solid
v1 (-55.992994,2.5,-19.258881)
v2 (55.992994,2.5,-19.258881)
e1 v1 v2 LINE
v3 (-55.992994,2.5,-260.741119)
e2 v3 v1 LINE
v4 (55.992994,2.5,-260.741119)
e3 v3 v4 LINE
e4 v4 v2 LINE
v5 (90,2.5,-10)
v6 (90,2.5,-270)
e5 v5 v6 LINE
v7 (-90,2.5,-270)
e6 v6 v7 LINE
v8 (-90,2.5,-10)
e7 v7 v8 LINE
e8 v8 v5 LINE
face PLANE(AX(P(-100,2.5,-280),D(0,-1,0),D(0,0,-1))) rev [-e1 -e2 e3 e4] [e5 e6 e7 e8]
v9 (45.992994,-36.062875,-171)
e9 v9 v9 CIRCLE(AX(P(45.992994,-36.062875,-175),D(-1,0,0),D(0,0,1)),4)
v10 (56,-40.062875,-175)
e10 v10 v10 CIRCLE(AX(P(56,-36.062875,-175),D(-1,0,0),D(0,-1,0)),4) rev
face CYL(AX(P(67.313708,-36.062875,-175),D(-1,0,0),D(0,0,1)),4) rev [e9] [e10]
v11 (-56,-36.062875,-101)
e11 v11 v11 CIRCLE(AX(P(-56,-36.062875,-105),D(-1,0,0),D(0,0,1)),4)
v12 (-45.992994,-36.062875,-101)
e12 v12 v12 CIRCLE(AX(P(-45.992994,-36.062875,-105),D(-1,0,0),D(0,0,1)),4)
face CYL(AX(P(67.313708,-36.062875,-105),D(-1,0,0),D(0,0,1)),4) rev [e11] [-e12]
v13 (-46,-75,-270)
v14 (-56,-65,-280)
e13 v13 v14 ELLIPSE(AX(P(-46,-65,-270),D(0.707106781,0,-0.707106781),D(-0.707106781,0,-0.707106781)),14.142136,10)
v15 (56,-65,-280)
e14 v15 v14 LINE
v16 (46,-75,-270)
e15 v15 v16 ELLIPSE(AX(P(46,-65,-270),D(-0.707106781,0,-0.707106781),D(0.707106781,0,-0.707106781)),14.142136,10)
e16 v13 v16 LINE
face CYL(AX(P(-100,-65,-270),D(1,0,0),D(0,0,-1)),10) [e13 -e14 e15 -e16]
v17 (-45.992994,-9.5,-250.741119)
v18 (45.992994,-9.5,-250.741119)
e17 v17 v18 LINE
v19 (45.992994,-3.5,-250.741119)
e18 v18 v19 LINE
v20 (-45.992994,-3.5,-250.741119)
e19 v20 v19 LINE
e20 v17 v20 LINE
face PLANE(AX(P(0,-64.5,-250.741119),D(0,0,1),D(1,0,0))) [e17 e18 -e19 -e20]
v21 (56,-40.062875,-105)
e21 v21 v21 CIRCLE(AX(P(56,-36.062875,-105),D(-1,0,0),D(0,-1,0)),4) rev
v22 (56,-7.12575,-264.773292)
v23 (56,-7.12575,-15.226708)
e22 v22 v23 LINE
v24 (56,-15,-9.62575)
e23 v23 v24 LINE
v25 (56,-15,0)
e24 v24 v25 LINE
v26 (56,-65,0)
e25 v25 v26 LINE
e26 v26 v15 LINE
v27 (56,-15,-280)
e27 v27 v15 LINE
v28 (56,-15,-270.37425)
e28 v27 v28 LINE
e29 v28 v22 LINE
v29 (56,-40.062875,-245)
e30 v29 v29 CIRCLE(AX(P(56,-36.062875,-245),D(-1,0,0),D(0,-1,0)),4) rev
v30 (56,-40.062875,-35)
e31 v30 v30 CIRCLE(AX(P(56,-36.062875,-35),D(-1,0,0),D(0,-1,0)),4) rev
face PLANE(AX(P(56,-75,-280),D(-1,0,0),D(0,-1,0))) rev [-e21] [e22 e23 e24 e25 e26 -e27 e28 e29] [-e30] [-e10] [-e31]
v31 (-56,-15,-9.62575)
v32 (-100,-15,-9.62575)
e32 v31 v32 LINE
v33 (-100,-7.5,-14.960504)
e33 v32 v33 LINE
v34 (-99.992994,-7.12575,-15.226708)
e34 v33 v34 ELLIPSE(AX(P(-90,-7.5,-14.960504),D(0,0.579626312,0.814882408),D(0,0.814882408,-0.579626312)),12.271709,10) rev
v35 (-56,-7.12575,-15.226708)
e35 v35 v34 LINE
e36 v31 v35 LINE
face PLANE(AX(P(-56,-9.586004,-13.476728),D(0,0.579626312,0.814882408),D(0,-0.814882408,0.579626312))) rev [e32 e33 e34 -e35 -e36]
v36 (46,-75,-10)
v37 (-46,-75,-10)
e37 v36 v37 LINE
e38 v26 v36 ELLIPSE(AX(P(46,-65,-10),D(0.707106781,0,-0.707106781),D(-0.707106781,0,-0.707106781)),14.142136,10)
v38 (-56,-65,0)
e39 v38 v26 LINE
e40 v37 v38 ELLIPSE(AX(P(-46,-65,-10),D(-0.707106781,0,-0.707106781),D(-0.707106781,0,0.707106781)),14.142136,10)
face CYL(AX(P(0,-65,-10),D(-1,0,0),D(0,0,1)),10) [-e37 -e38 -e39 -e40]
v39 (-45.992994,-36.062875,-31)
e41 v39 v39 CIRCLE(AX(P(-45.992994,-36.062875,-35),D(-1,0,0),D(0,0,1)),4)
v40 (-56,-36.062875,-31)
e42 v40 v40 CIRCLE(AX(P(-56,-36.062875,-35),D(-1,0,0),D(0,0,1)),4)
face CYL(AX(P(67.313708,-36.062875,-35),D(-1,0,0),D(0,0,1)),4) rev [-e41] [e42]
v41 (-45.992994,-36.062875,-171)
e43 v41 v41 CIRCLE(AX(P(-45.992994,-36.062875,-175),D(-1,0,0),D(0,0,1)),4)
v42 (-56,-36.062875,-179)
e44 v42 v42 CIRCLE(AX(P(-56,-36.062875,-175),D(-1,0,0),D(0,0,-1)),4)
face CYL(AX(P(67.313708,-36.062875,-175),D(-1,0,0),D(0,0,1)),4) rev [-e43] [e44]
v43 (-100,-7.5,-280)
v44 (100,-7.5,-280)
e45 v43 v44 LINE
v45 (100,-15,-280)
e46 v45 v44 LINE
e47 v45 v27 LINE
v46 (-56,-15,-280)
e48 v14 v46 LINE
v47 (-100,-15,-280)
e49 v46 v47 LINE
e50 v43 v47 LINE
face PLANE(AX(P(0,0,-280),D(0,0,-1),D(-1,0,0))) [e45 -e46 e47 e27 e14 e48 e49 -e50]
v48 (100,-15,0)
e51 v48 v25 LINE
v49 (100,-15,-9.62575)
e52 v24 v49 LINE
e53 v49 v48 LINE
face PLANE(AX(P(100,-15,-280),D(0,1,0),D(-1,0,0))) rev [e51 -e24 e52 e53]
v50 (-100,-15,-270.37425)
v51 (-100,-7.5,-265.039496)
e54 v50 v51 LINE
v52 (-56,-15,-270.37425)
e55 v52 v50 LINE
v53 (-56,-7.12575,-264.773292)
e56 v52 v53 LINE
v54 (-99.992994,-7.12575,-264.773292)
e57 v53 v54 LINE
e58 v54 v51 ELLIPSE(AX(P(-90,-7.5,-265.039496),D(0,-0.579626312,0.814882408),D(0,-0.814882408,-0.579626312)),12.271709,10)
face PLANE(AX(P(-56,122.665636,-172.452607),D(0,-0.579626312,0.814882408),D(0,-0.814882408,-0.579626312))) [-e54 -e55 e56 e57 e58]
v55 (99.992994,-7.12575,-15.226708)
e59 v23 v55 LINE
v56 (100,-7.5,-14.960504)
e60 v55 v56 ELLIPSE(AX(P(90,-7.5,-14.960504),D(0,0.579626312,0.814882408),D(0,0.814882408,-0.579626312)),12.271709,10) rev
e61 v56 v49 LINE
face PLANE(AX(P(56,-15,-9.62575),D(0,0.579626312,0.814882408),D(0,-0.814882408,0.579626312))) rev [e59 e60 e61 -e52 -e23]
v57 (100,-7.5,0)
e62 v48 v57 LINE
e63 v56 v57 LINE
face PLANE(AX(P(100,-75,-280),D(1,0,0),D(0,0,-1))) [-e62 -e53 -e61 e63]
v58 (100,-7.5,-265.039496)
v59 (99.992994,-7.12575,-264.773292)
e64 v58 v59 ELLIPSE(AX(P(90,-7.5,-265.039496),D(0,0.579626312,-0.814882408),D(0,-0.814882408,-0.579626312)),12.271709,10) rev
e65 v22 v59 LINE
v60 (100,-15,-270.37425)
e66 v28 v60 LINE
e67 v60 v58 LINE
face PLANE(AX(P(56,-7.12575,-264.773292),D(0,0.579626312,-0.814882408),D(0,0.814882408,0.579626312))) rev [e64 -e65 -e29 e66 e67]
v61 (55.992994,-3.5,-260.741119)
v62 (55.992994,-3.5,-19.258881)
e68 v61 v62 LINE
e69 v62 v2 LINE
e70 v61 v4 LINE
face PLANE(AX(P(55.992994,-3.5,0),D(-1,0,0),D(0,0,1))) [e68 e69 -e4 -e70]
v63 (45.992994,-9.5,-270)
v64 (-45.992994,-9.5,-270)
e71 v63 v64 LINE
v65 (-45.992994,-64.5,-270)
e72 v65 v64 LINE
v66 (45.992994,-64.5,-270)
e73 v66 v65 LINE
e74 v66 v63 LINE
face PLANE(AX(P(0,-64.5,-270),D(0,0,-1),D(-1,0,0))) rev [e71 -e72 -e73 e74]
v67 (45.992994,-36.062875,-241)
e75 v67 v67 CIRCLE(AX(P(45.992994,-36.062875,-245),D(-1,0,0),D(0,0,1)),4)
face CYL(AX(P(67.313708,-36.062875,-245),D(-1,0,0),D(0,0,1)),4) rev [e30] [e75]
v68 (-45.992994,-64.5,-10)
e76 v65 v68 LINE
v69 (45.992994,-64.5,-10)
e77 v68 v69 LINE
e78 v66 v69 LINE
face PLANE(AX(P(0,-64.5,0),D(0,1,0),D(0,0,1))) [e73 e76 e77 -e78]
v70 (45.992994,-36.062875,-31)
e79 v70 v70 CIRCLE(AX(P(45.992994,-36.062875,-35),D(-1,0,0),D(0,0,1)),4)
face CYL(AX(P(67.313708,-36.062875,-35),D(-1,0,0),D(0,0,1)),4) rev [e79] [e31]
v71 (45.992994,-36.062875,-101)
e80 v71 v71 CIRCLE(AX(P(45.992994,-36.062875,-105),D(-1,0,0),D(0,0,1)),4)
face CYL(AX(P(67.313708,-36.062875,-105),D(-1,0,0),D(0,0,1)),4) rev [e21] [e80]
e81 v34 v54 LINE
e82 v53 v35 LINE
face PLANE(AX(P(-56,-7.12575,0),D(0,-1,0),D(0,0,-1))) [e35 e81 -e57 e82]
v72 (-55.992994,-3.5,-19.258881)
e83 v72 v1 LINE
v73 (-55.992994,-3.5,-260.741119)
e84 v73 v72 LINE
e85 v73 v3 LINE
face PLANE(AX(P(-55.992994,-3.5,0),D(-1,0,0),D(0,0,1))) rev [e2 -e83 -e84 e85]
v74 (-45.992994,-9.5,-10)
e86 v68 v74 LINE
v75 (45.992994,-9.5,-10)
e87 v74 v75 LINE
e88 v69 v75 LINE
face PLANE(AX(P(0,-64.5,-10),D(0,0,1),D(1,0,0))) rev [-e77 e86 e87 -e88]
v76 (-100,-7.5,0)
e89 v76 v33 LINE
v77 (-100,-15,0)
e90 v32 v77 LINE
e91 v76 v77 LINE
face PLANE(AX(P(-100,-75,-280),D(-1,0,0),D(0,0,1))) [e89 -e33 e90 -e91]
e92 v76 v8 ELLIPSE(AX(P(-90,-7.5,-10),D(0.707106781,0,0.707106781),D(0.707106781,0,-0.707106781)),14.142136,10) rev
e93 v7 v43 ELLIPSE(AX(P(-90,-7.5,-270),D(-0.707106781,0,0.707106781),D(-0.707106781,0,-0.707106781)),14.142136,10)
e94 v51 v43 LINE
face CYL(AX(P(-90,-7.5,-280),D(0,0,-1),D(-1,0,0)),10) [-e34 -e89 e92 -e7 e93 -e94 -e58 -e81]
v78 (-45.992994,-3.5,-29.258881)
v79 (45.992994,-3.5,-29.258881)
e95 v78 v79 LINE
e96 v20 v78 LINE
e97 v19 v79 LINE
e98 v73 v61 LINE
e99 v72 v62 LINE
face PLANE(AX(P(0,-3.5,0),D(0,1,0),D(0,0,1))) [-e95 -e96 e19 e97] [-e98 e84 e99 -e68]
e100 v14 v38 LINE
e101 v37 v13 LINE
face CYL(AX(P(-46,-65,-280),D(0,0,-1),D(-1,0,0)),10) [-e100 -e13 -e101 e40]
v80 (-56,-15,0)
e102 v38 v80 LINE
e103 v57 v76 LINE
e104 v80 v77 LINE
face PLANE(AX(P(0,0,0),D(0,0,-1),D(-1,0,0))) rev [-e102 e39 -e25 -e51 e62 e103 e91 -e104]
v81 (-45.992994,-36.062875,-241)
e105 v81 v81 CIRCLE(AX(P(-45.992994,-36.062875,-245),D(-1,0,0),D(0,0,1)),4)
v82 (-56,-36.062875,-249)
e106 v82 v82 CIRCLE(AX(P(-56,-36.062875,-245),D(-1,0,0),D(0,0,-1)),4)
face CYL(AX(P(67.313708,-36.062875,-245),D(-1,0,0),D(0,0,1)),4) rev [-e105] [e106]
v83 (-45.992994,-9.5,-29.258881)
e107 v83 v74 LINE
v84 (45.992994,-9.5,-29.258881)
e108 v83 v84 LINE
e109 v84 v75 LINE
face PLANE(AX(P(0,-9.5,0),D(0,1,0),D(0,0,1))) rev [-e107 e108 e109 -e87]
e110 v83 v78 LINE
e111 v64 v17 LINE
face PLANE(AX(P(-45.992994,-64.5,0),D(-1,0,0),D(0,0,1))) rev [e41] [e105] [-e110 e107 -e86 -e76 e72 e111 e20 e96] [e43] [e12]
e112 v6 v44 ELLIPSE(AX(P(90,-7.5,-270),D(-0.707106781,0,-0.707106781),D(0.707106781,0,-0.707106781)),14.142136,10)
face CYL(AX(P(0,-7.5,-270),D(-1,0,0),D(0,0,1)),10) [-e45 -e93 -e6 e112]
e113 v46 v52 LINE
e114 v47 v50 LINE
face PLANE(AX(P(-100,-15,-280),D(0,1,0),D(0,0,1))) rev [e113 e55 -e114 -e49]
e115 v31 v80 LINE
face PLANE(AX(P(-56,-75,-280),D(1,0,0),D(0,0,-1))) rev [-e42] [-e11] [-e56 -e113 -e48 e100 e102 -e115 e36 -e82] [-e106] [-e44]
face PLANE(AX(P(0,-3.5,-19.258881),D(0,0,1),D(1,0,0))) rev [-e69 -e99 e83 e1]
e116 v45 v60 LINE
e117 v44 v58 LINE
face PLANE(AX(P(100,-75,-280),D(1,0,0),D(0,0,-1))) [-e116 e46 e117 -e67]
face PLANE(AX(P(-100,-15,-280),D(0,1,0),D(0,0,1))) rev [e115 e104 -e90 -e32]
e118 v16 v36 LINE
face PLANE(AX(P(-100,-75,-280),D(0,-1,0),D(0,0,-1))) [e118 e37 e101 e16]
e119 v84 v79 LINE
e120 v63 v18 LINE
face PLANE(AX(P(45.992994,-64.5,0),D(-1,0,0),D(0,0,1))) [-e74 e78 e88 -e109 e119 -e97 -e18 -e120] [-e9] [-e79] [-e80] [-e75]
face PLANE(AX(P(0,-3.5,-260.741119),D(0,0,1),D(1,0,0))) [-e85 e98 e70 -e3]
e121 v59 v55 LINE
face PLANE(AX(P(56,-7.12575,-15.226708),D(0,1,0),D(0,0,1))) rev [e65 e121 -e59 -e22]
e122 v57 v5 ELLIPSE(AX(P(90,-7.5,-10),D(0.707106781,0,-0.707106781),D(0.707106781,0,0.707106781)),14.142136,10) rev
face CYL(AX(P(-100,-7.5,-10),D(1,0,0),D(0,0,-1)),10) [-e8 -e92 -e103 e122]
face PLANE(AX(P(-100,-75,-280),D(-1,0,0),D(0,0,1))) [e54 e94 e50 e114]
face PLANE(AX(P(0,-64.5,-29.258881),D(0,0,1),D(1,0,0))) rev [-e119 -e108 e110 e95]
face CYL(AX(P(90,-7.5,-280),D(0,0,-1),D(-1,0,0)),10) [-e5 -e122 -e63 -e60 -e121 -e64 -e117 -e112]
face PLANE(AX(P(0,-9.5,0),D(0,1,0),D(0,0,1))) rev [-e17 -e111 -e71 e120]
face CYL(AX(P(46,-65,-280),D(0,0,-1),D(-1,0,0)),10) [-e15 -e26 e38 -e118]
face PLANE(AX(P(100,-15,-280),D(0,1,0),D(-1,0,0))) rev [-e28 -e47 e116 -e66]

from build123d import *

# Parameters (mm, degrees)
SKETCH1_W           = 200
SKETCH1_H           = 150
BOSS_EXTRUDE1_DEPTH = 280
SKETCH2_W           = 44
SKETCH2_H           = 60
SKETCH2_W_2         = 34
SKETCH2_H_2         = 72.5
CUT_EXTRUDE1_DEPTH  = 280
CUT_EXTRUDE5_DEPTH  = 200
CUT_EXTRUDE8_DEPTH  = 44
CUT_EXTRUDE9_DEPTH  = 44
SKETCH6_W           = 112
SKETCH6_H           = 52.5
CUT_EXTRUDE7_DEPTH  = 280
FILLET1_START       = -100
FILLET1_DEPTH       = 200
FILLET1_START_2     = -76
FILLET1_2_DEPTH     = 10
FILLET1_START_3     = 66
FILLET1_3_DEPTH     = 10
FILLET1_START_4     = -66
FILLET1_4_DEPTH     = 132
FILLET1_START_5     = -281
FILLET1_5_DEPTH     = 282
SKETCH8_W           = 152
SKETCH8_H           = 72.5
CUT_EXTRUDE10_DEPTH = 280
SKETCH9_W           = 111.98598877
SKETCH9_H           = 241.482238642
SKETCH9_W_2         = 91.98598877
SKETCH9_H_2         = 221.482238642
SKETCH9_H_3         = 10
CUT_EXTRUDE11_DEPTH = 6
SKETCH9_3_W         = 45.992994385
SKETCH9_3_H         = 221.482238642
CUT_EXTRUDE12_DEPTH = 67
CUT_EXTRUDE13_START = -12
SKETCH9_7_W         = 91.98598877
SKETCH9_7_H         = 9.258880679
CUT_EXTRUDE13_DEPTH = 55
CUT_EXTRUDE14_START = -12
SKETCH9_9_W         = 91.98598877
SKETCH9_9_H         = 10
CUT_EXTRUDE14_DEPTH = 55
CUT_EXTRUDE15_REACH = 331.182
SKETCH11_R          = 4


with BuildPart() as part:
    # Sketch1 → Boss-Extrude1 (new body)
    with BuildSketch(Plane.XY):
        Rectangle(SKETCH1_W, SKETCH1_H)
    extrude(amount=-BOSS_EXTRUDE1_DEPTH)

    # Sketch2 → Cut-Extrude1 (cut)
    with BuildSketch(Plane.XY):
        with Locations((78, -45)):
            Rectangle(SKETCH2_W, SKETCH2_H)
        with Locations((-78, -45)):
            Rectangle(SKETCH2_W, SKETCH2_H)
        with Locations((83, 38.75)):
            Rectangle(SKETCH2_W_2, SKETCH2_H_2)
        with Locations((-83, 38.75)):
            Rectangle(SKETCH2_W_2, SKETCH2_H_2)
    extrude(amount=-CUT_EXTRUDE1_DEPTH, mode=Mode.SUBTRACT)

    # Sketch3 → Cut-Extrude5 (cut)
    with BuildSketch(Plane.ZY.offset(100)):
        Polygon((-280, 2.5), (-274.399041425, 2.5), (-252, 2.5), (-218.971094498, 75), (-280, 75), align=None)
        Polygon((-236.455453487, 12.5), (-168.766953205, 12.5), (-60.438488841, 12.5), (-94.602997447, 65), (-144.84946991, 65), (-212.537970192, 65), align=None)
        Polygon((-89.179559504, 75), (-42, 2.5), (-5.600958575, 2.5), (0, 2.5), (0, 75), align=None)
    extrude(amount=-CUT_EXTRUDE5_DEPTH, mode=Mode.SUBTRACT)

    # Sketch5 → Cut-Extrude8 (cut)
    with BuildSketch(Plane.ZY.offset(100)):
        Polygon((-264.773291637, -7.125749789), (-270.374250211, -15), (-140, -15), (-140, -7.125749789), align=None)
        Polygon((-15.226708363, -7.125749789), (-140, -7.125749789), (-140, -15), (-9.625749789, -15), align=None)
    extrude(amount=-CUT_EXTRUDE8_DEPTH, mode=Mode.SUBTRACT)

    # Sketch7 → Cut-Extrude9 (cut)
    with BuildSketch(Plane(origin=(100, 0, 0), x_dir=(0, 0, -1), z_dir=(1, 0, 0))):
        Polygon((9.625749789, -15), (15.226708363, -7.125749789), (264.773291637, -7.125749789), (270.374250211, -15), align=None)
    extrude(amount=-CUT_EXTRUDE9_DEPTH, mode=Mode.SUBTRACT)

    # Sketch6 → Cut-Extrude7 (cut)
    with BuildSketch(Plane.XY):
        with Locations((0, 38.75)):
            Rectangle(SKETCH6_W, SKETCH6_H)
    extrude(amount=-CUT_EXTRUDE7_DEPTH, mode=Mode.SUBTRACT)

    # Fillet1: read off the stored shape, not the designer's step
    # Fillet1 outline → Fillet1 (cut)
    with BuildSketch(Plane.YZ.offset(FILLET1_START)):
        with BuildLine():
            Line((-75, 0), (-75, -10))
            ThreePointArc((-75, -10), (-72.071067812, -2.928932188), (-65, 0))
            Line((-65, 0), (-75, 0))
        make_face()
        with BuildLine():
            ThreePointArc((-65, -280), (-72.071067812, -277.071067812), (-75, -270))
            Line((-75, -270), (-75, -280))
            Line((-75, -280), (-65, -280))
        make_face()
        with BuildLine():
            Line((2.5, 0), (-7.5, 0))
            ThreePointArc((-7.5, 0), (-0.428932188, -2.928932188), (2.5, -10))
            Line((2.5, -10), (2.5, 0))
        make_face()
        with BuildLine():
            ThreePointArc((2.5, -270), (-0.428932188, -277.071067812), (-7.5, -280))
            Line((-7.5, -280), (2.5, -280))
            Line((2.5, -280), (2.5, -270))
        make_face()
        with BuildLine():
            Line((75, -89.179559504), (70.454316835, -86.221444616))
            ThreePointArc((70.454316835, -86.221444616), (73.790425711, -89.835564613), (75, -94.602997447))
            Line((75, -94.602997447), (75, -89.179559504))
        make_face()
        with BuildLine():
            ThreePointArc((75, -212.537970192), (73.410042611, -217.948255145), (69.145763344, -221.638115591))
            Line((69.145763344, -221.638115591), (75, -218.971094498))
            Line((75, -218.971094498), (75, -212.537970192))
        make_face()
    extrude(amount=FILLET1_DEPTH, mode=Mode.SUBTRACT)

    # Fillet1 2 outline → Fillet1 2 (add)
    with BuildSketch(Plane.YZ.offset(FILLET1_START_2)):
        with BuildLine():
            ThreePointArc((7.045683165, -44.958114888), (3.709574289, -41.343994891), (2.5, -36.576562057))
            Line((2.5, -36.576562057), (2.5, -258.433124306))
            ThreePointArc((2.5, -258.433124306), (4.089957389, -253.022839352), (8.354236656, -249.332978906))
            Line((8.354236656, -249.332978906), (69.145763344, -221.638115591))
            ThreePointArc((69.145763344, -221.638115591), (73.410042611, -217.948255145), (75, -212.537970192))
            Line((75, -212.537970192), (75, -94.602997447))
            ThreePointArc((75, -94.602997447), (73.790425711, -89.835564613), (70.454316835, -86.221444616))
            Line((70.454316835, -86.221444616), (7.045683165, -44.958114888))
        make_face()
    extrude(amount=FILLET1_2_DEPTH)

    # Fillet1 3 outline → Fillet1 3 (add)
    with BuildSketch(Plane.YZ.offset(FILLET1_START_3)):
        with BuildLine():
            ThreePointArc((7.045683165, -44.958114888), (3.709574289, -41.343994891), (2.5, -36.576562057))
            Line((2.5, -36.576562057), (2.5, -258.433124306))
            ThreePointArc((2.5, -258.433124306), (4.089957389, -253.022839352), (8.354236656, -249.332978906))
            Line((8.354236656, -249.332978906), (69.145763344, -221.638115591))
            ThreePointArc((69.145763344, -221.638115591), (73.410042611, -217.948255145), (75, -212.537970192))
            Line((75, -212.537970192), (75, -94.602997447))
            ThreePointArc((75, -94.602997447), (73.790425711, -89.835564613), (70.454316835, -86.221444616))
            Line((70.454316835, -86.221444616), (7.045683165, -44.958114888))
        make_face()
    extrude(amount=FILLET1_3_DEPTH)

    # Fillet1 4 outline → Fillet1 4 (add)
    with BuildSketch(Plane.YZ.offset(FILLET1_START_4)):
        with BuildLine():
            ThreePointArc((7.045683165, -44.958114888), (3.709574289, -41.343994891), (2.5, -36.576562057))
            Line((2.5, -36.576562057), (2.5, -42))
            Line((2.5, -42), (7.045683165, -44.958114888))
        make_face()
        with BuildLine():
            Line((2.5, -252), (2.5, -258.433124306))
            ThreePointArc((2.5, -258.433124306), (4.089957389, -253.022839352), (8.354236656, -249.332978906))
            Line((8.354236656, -249.332978906), (2.5, -252))
        make_face()
    extrude(amount=FILLET1_4_DEPTH)

    # Fillet1 5 outline → Fillet1 5 (cut)
    with BuildSketch(Plane.XY.offset(FILLET1_START_5)):
        with BuildLine():
            ThreePointArc((56, 75), (63.071067812, 72.071067812), (66, 65))
            Line((66, 65), (66, 12.5))
            ThreePointArc((66, 12.5), (68.928932188, 5.428932188), (76, 2.5))
            Line((76, 2.5), (76, 75))
            Line((76, 75), (56, 75))
        make_face()
        with BuildLine():
            ThreePointArc((-66, 65), (-63.071067812, 72.071067812), (-56, 75))
            Line((-56, 75), (-76, 75))
            Line((-76, 75), (-76, 2.5))
            ThreePointArc((-76, 2.5), (-68.928932188, 5.428932188), (-66, 12.5))
            Line((-66, 12.5), (-66, 65))
        make_face()
        with BuildLine():
            Line((100, 2.5), (90, 2.5))
            ThreePointArc((90, 2.5), (97.071067812, -0.428932188), (100, -7.5))
            Line((100, -7.5), (100, 2.5))
        make_face()
        with BuildLine():
            Line((-90, 2.5), (-100, 2.5))
            Line((-100, 2.5), (-100, -7.5))
            ThreePointArc((-100, -7.5), (-97.071067812, -0.428932188), (-90, 2.5))
        make_face()
        with BuildLine():
            Line((56, -75), (56, -65))
            ThreePointArc((56, -65), (53.071067812, -72.071067812), (46, -75))
            Line((46, -75), (56, -75))
        make_face()
        with BuildLine():
            ThreePointArc((-46, -75), (-53.071067812, -72.071067812), (-56, -65))
            Line((-56, -65), (-56, -75))
            Line((-56, -75), (-46, -75))
        make_face()
    extrude(amount=FILLET1_5_DEPTH, mode=Mode.SUBTRACT)

    # Sketch8 → Cut-Extrude10 (cut)
    with BuildSketch(Plane.XY):
        with Locations((0, 38.75)):
            Rectangle(SKETCH8_W, SKETCH8_H)
    extrude(amount=-CUT_EXTRUDE10_DEPTH, mode=Mode.SUBTRACT)

    # Sketch9 → Cut-Extrude11 (cut)
    # profile 1 of 4: a face of its own
    with BuildSketch(Plane(origin=(0, 2.5, 0), x_dir=(1, 0, 0), z_dir=(0, 1, 0))):
        with Locations((0, 140)):
            Rectangle(SKETCH9_W, SKETCH9_H)
        with Locations((0, 140)):
            Rectangle(SKETCH9_W_2, SKETCH9_H_2, mode=Mode.SUBTRACT)
    # profile 2 of 4: a face of its own
    with BuildSketch(Plane(origin=(0, 2.5, 0), x_dir=(1, 0, 0), z_dir=(0, 1, 0))):
        Polygon((55.992994385, 260.741119321), (45.992994385, 260.741119321), (45.992994385, 250.741119321), (45.992994385, 29.258880679), (45.992994385, 19.258880679), (55.992994385, 19.258880679), align=None)
    # profile 3 of 4: a face of its own
    with BuildSketch(Plane(origin=(0, 2.5, 0), x_dir=(1, 0, 0), z_dir=(0, 1, 0))):
        with Locations((0, 255.741119321)):
            Rectangle(SKETCH9_W_2, SKETCH9_H_3)
    # profile 4 of 4: a face of its own
    with BuildSketch(Plane(origin=(0, 2.5, 0), x_dir=(1, 0, 0), z_dir=(0, 1, 0))):
        with Locations((0, 24.258880679)):
            Rectangle(SKETCH9_W_2, SKETCH9_H_3)
    extrude(amount=-CUT_EXTRUDE11_DEPTH, mode=Mode.SUBTRACT)

    # Sketch9<3> → Cut-Extrude12 (cut)
    with BuildSketch(Plane(origin=(0, 2.5, 0), x_dir=(1, 0, 0), z_dir=(0, 1, 0))):
        with Locations((-22.996497193, 140)):
            Rectangle(SKETCH9_3_W, SKETCH9_3_H)
        with Locations((22.996497193, 140)):
            Rectangle(SKETCH9_3_W, SKETCH9_3_H)
    extrude(amount=-CUT_EXTRUDE12_DEPTH, mode=Mode.SUBTRACT)

    # Sketch9<7> → Cut-Extrude13 (cut)
    with BuildSketch(Plane(origin=(0, 2.5, 0), x_dir=(1, 0, 0), z_dir=(0, 1, 0)).offset(CUT_EXTRUDE13_START)):
        with Locations((0, 265.370559661)):
            Rectangle(SKETCH9_7_W, SKETCH9_7_H)
        with Locations((0, 14.62944034)):
            Rectangle(SKETCH9_7_W, SKETCH9_7_H)
    extrude(amount=-CUT_EXTRUDE13_DEPTH, mode=Mode.SUBTRACT)

    # Sketch9<9> → Cut-Extrude14 (cut)
    with BuildSketch(Plane(origin=(0, 2.5, 0), x_dir=(1, 0, 0), z_dir=(0, 1, 0)).offset(CUT_EXTRUDE14_START)):
        with Locations((0, 255.741119321)):
            Rectangle(SKETCH9_9_W, SKETCH9_9_H)
        with Locations((0, 24.258880679)):
            Rectangle(SKETCH9_9_W, SKETCH9_9_H)
    extrude(amount=-CUT_EXTRUDE14_DEPTH, mode=Mode.SUBTRACT)

    # Cut-Extrude15: up to this face of the body (flat: up to its plane)
    cut_extrude15_end = Plane(part.part.faces().sort_by_distance((56, -36.372089238, -140))[0])
    # Sketch11 → Cut-Extrude15 (cut, up to the picked face)
    with BuildSketch(Plane.ZY.offset(56), mode=Mode.PRIVATE) as cut_extrude15_sk1:
        with Locations((-35, -36.062874894)):
            Circle(SKETCH11_R)
    cut_extrude15_tool1 = split(extrude(cut_extrude15_sk1.sketch, amount=-CUT_EXTRUDE15_REACH, mode=Mode.PRIVATE), bisect_by=cut_extrude15_end, keep=Keep.BOTH, mode=Mode.PRIVATE)
    # Sketch11 → Cut-Extrude15 (cut, up to the picked face)
    with BuildSketch(Plane.ZY.offset(56), mode=Mode.PRIVATE) as cut_extrude15_sk2:
        with Locations((-105, -36.062874894)):
            Circle(SKETCH11_R)
    cut_extrude15_tool2 = split(extrude(cut_extrude15_sk2.sketch, amount=-CUT_EXTRUDE15_REACH, mode=Mode.PRIVATE), bisect_by=cut_extrude15_end, keep=Keep.BOTH, mode=Mode.PRIVATE)
    # Sketch11 → Cut-Extrude15 (cut, up to the picked face)
    with BuildSketch(Plane.ZY.offset(56), mode=Mode.PRIVATE) as cut_extrude15_sk3:
        with Locations((-175, -36.062874894)):
            Circle(SKETCH11_R)
    cut_extrude15_tool3 = split(extrude(cut_extrude15_sk3.sketch, amount=-CUT_EXTRUDE15_REACH, mode=Mode.PRIVATE), bisect_by=cut_extrude15_end, keep=Keep.BOTH, mode=Mode.PRIVATE)
    # Sketch11 → Cut-Extrude15 (cut, up to the picked face)
    with BuildSketch(Plane.ZY.offset(56), mode=Mode.PRIVATE) as cut_extrude15_sk4:
        with Locations((-245, -36.062874894)):
            Circle(SKETCH11_R)
    cut_extrude15_tool4 = split(extrude(cut_extrude15_sk4.sketch, amount=-CUT_EXTRUDE15_REACH, mode=Mode.PRIVATE), bisect_by=cut_extrude15_end, keep=Keep.BOTH, mode=Mode.PRIVATE)
    add(cut_extrude15_tool1.solids().sort_by(Axis((-56, -36.062875, -35), (1, 0, 0)))[0], mode=Mode.SUBTRACT)
    add(cut_extrude15_tool2.solids().sort_by(Axis((-56, -36.062875, -105), (1, 0, 0)))[0], mode=Mode.SUBTRACT)
    add(cut_extrude15_tool3.solids().sort_by(Axis((-56, -36.062875, -175), (1, 0, 0)))[0], mode=Mode.SUBTRACT)
    add(cut_extrude15_tool4.solids().sort_by(Axis((-56, -36.062875, -245), (1, 0, 0)))[0], mode=Mode.SUBTRACT)


solid = part.part
